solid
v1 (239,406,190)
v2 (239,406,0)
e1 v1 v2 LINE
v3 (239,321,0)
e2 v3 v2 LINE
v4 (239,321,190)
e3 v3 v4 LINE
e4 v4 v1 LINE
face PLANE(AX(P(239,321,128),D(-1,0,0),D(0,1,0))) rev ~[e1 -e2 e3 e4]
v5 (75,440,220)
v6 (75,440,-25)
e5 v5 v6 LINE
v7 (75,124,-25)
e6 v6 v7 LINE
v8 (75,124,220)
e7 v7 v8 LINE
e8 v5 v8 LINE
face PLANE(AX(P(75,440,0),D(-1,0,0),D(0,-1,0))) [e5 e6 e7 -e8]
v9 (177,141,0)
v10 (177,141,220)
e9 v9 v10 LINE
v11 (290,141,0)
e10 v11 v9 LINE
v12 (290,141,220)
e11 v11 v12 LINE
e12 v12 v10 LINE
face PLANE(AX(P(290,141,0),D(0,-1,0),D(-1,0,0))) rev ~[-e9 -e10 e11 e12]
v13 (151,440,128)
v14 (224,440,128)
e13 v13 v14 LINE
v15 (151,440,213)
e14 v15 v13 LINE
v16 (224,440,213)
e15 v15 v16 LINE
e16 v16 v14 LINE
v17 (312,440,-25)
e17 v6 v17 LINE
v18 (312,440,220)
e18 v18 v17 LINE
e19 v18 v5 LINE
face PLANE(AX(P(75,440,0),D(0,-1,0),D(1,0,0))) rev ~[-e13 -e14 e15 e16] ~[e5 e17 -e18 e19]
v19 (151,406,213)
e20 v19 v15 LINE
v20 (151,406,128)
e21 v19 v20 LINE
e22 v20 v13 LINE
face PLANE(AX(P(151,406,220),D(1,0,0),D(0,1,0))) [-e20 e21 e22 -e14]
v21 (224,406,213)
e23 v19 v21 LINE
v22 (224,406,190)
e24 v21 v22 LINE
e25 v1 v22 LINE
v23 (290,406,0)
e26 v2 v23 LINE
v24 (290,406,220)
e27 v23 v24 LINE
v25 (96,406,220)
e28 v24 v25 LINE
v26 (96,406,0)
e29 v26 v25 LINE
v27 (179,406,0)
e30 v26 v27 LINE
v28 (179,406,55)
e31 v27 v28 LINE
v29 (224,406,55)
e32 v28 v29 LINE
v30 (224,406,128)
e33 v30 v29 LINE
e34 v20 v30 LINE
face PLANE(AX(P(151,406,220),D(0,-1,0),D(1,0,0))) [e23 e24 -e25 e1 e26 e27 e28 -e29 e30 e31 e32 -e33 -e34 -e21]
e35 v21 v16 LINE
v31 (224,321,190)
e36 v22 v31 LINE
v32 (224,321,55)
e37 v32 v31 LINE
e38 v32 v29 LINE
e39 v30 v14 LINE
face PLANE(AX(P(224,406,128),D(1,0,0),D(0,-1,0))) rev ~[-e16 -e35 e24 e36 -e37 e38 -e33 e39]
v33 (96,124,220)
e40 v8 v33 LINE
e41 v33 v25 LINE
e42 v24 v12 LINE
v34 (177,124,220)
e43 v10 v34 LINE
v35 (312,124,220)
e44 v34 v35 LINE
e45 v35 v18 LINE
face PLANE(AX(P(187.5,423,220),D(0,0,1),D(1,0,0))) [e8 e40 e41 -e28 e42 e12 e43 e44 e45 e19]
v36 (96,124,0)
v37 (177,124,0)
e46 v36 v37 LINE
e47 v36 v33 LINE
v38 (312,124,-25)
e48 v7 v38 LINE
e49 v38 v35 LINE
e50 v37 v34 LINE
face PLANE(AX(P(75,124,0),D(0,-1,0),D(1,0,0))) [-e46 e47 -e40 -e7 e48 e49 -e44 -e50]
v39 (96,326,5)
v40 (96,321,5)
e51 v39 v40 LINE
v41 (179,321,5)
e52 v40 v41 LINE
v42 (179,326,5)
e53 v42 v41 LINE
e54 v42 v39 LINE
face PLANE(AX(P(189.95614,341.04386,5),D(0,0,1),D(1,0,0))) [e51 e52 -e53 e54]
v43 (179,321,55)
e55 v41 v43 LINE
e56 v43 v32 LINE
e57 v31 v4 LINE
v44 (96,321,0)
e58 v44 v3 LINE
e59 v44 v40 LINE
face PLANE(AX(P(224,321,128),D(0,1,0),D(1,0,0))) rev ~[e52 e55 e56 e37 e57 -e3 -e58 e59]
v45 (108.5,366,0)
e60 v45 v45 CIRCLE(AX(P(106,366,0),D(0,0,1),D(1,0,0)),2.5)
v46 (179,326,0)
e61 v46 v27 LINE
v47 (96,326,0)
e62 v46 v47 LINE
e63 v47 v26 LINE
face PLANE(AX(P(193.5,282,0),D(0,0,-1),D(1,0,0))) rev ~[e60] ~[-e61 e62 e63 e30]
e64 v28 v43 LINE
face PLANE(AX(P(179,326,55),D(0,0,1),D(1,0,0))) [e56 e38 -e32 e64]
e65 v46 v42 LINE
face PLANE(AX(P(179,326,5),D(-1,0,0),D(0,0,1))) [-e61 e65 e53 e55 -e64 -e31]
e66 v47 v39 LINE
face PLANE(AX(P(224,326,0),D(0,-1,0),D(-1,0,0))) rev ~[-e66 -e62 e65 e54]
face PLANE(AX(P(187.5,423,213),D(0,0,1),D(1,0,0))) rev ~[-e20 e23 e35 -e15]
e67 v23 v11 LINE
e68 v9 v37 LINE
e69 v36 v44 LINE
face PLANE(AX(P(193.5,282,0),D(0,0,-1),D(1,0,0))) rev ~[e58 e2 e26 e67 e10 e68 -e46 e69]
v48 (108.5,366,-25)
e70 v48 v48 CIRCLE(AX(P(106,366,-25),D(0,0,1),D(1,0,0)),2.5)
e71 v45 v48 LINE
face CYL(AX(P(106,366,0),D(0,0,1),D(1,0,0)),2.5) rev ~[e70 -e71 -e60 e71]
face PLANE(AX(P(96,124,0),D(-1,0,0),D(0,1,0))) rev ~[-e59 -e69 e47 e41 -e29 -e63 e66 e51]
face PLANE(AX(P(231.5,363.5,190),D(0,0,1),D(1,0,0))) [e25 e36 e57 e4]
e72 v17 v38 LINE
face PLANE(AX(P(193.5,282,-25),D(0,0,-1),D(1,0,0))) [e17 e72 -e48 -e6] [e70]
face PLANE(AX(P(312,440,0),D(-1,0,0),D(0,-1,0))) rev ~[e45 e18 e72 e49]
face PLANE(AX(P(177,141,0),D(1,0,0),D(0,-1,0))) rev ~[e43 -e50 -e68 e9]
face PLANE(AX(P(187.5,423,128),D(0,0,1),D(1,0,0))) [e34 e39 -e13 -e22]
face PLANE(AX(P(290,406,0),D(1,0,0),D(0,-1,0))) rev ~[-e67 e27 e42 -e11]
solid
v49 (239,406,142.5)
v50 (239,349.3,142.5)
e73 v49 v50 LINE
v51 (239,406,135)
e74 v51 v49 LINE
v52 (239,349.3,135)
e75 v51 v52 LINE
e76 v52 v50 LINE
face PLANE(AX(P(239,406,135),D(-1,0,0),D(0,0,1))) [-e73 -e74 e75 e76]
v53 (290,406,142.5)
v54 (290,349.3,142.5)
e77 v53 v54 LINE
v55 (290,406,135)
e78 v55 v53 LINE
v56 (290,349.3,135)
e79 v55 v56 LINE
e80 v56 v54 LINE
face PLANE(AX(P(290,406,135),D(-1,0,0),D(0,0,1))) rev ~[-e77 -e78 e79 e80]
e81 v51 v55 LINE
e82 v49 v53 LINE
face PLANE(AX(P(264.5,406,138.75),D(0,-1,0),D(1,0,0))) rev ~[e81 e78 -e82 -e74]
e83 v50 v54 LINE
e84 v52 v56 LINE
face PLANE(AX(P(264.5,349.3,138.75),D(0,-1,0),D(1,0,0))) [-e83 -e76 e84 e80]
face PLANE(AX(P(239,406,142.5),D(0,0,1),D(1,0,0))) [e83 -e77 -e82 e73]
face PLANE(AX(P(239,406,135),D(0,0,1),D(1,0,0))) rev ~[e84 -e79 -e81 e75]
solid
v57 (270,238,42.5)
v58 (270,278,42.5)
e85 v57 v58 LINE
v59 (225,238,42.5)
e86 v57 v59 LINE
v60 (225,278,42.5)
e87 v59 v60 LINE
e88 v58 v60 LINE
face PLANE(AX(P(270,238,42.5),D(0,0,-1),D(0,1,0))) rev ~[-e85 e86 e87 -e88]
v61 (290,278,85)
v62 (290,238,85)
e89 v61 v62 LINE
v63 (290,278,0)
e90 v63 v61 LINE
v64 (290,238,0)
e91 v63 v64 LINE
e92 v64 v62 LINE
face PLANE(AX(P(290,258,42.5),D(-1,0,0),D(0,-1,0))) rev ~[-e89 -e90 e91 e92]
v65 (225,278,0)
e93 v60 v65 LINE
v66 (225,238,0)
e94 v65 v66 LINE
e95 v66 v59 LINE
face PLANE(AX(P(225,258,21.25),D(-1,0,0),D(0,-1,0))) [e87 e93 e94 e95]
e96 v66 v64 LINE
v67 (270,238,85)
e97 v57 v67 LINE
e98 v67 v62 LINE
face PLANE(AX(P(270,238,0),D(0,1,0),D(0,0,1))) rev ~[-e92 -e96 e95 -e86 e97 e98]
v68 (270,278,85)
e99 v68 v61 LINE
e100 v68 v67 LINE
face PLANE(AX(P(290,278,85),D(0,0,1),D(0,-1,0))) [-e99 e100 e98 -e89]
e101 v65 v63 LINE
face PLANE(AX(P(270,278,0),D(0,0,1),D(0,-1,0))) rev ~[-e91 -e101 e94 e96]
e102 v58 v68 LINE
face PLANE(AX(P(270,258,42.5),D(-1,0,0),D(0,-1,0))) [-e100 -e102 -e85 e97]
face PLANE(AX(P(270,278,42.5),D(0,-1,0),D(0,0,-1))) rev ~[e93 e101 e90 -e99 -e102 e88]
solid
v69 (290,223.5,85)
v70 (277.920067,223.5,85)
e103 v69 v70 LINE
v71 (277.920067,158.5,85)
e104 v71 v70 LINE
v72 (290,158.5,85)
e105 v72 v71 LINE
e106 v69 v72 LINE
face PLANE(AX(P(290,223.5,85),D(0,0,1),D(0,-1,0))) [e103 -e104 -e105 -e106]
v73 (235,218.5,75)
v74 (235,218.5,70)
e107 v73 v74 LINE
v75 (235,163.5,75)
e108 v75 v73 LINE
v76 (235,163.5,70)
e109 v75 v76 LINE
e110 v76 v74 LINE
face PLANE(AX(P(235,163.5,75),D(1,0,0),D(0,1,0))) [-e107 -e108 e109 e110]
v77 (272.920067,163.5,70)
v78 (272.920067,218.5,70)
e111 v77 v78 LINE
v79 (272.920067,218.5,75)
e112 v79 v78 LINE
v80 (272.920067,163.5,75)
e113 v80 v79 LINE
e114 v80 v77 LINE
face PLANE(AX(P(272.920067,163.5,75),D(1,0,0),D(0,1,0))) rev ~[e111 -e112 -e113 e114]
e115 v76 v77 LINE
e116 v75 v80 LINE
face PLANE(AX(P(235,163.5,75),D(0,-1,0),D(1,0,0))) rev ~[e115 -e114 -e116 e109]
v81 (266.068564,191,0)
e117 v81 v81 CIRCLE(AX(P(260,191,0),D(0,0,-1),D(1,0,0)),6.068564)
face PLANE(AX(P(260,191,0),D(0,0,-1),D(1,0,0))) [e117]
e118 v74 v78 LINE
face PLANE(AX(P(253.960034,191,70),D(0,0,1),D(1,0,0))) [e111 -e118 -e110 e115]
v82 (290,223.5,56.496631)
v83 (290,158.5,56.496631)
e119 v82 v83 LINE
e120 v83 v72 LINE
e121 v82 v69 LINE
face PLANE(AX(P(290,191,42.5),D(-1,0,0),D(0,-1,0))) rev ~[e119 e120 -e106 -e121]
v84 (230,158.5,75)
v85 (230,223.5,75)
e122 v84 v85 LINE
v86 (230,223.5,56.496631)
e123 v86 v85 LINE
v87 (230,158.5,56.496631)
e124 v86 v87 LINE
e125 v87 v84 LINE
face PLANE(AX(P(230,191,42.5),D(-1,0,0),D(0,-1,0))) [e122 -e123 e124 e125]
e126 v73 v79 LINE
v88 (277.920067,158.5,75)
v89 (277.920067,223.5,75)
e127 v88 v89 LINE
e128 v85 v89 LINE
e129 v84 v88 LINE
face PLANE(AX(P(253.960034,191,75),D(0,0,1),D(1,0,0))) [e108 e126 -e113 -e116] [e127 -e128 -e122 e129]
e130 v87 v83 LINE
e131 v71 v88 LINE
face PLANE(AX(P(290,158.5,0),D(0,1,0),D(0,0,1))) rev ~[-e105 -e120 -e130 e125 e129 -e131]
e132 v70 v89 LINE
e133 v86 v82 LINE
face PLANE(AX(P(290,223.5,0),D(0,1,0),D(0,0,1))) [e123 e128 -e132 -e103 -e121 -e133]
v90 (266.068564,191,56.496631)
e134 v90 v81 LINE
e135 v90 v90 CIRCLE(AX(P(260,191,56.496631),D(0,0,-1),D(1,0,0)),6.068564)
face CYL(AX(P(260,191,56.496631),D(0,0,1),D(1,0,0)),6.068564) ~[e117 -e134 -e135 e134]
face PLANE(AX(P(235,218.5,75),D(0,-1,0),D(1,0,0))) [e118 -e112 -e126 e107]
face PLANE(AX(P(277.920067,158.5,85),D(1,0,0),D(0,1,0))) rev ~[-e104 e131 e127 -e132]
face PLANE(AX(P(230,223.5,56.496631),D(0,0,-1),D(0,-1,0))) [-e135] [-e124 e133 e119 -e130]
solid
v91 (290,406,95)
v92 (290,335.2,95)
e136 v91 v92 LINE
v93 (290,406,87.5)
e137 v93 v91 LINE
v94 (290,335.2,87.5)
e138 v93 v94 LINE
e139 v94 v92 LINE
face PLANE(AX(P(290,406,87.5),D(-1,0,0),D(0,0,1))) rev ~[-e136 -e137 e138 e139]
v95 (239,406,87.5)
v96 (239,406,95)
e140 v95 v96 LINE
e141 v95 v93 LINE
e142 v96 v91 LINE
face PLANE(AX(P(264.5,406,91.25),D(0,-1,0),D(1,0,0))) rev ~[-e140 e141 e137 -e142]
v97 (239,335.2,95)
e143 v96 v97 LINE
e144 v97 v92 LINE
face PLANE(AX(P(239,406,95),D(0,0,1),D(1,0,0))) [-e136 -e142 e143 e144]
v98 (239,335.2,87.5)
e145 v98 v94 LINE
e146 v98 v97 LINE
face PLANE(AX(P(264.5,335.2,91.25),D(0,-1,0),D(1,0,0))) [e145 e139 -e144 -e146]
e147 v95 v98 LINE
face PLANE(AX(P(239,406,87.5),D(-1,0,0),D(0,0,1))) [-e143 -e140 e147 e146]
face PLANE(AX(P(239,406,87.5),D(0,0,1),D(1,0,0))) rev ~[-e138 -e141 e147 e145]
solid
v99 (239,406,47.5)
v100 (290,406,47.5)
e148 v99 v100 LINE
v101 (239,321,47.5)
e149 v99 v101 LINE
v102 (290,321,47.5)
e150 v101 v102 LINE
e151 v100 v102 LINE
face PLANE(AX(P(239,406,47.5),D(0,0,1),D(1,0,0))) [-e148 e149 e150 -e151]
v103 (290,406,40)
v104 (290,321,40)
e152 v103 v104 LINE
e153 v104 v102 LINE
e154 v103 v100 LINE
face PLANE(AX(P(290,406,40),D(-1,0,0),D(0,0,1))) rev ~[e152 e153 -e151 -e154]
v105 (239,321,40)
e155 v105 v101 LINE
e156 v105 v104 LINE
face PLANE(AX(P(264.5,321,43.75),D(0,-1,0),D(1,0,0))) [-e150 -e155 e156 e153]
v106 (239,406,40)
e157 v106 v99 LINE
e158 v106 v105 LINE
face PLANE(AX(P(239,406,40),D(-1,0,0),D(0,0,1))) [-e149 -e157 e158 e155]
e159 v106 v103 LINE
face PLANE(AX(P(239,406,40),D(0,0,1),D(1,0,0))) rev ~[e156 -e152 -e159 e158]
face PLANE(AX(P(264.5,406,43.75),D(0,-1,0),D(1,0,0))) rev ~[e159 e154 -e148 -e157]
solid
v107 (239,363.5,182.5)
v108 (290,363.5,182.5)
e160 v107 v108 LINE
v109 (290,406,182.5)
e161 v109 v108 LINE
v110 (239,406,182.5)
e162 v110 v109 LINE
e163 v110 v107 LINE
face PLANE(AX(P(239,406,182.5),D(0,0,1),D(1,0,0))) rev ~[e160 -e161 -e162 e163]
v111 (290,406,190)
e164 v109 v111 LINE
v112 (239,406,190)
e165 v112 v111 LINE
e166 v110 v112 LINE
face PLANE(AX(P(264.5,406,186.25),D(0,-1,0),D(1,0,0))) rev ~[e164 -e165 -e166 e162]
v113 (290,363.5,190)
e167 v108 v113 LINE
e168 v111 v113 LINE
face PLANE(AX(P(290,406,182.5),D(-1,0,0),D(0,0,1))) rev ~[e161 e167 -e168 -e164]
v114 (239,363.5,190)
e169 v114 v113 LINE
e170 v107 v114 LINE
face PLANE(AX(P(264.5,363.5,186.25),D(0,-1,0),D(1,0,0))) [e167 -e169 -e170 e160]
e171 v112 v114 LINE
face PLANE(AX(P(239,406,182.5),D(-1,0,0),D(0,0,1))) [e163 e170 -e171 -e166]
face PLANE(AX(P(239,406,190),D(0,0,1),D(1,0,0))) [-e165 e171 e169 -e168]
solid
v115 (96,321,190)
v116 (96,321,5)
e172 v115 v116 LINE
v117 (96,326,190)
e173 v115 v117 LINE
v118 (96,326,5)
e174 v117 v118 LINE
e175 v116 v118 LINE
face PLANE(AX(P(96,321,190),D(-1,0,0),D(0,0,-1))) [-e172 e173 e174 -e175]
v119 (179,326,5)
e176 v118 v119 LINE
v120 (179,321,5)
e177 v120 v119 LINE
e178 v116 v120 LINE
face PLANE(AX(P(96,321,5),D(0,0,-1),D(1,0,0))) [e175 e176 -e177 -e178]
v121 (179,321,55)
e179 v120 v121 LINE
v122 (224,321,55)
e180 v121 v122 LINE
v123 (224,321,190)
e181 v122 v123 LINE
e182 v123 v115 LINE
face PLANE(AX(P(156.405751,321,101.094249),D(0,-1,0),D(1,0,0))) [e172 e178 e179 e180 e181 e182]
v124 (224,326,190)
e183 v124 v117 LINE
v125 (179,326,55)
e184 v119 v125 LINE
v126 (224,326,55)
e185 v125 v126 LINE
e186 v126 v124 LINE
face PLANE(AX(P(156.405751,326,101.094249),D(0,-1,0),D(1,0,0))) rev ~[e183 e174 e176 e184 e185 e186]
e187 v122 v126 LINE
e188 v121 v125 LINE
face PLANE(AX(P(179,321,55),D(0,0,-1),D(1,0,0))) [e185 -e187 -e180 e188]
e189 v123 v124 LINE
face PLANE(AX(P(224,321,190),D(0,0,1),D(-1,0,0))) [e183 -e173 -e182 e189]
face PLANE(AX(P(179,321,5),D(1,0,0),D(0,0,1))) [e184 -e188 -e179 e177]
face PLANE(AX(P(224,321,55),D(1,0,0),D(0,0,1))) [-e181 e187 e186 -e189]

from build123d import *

# Parameters (mm, degrees)
F2_DEPTH  = 220
F3_W      = 73
F3_H      = 34
F4_DEPTH  = 92
F5_W      = 73
F5_H      = 34
F6_DEPTH  = 7
F7_W      = 237
F7_H      = 316
F8_DEPTH  = 25
F9_W      = 40
F9_H      = 85
F10_DEPTH = 10
F11_R     = 2.5
F12_DEPTH = 25
F13_DEPTH = 20
F15_DEPTH = 45
F16_W     = 65
F16_H     = 85
F17_DEPTH = 60
F18_W     = 47.9200673103
F18_H     = 65
F19_DEPTH = 10
F20_W     = 65
F20_H     = 56.4966313541
F21_DEPTH = 60
F22_R     = 6.0685644394
F23_DEPTH = 56.4966313541
F24_W     = 37.9200673103
F24_H     = 55
F25_DEPTH = 5
F27_DEPTH = 5
F29_DEPTH = 123
F30_W     = 45
F30_H     = 80
F31_DEPTH = 55
F32_DEPTH = 5
F34_DEPTH = 5
F35_DEPTH = 62
F37_W     = 51
F37_H     = 7.5
F38_DEPTH = 85
F39_W     = 51
F39_H     = 7.5
F40_DEPTH = 70.8
F41_W     = 51
F41_H     = 7.5
F42_DEPTH = 56.7
F43_W     = 51
F43_H     = 7.5
F44_DEPTH = 42.5


with BuildPart() as f2:
    # F1 (on Top) → F2 (new body)
    with BuildSketch(Plane.XY):
        Polygon((224, 406), (290, 406), (290, 141), (177, 141), (177, 124), (290, 124), (312, 124), (312, 406), (312, 440), (75, 440), (75, 406), (75, 141), (75, 124), (96, 124), (96, 222), (96, 406), (151, 406), align=None)
    extrude(amount=F2_DEPTH)

    # F3 (on face) → F4 (cut)
    with BuildSketch(Plane.XY.offset(220)):
        with Locations((187.5, 423)):
            Rectangle(F3_W, F3_H)
    extrude(amount=-F4_DEPTH, mode=Mode.SUBTRACT)

    # F5 (on face) → F6 (join)
    with BuildSketch(Plane.XY.offset(220)):
        with Locations((187.5, 423)):
            Rectangle(F5_W, F5_H)
    extrude(amount=-F6_DEPTH)

    # F7 (on face) → F8 (join)
    with BuildSketch(Plane(origin=(0, 0, 0), x_dir=(1, 0, 0), z_dir=(0, 0, -1))):
        with Locations((193.5, -282)):
            Rectangle(F7_W, F7_H)
    extrude(amount=F8_DEPTH)

    # F11 (on face) → F12 (cut)
    with BuildSketch(Plane.XY):
        with Locations((106, 366)):
            Circle(F11_R)
    extrude(amount=-F12_DEPTH, mode=Mode.SUBTRACT)

    # F26 (on face) → F27 (join)
    with BuildSketch(Plane.XY):
        Polygon((96, 326), (96, 321), (239, 321), (239, 406), (224, 406), (224, 326), align=None)
    extrude(amount=F27_DEPTH)

    # F28 (on face) → F29 (join, through all)
    with BuildSketch(Plane.XY.offset(5)):
        Polygon((239, 406), (224, 406), (224, 326), (224, 321), (239, 321), align=None)
    extrude(amount=F29_DEPTH)

    # F30 (on face) → F31 (join)
    with BuildSketch(Plane.XY):
        with Locations((201.5, 366)):
            Rectangle(F30_W, F30_H)
    extrude(amount=F31_DEPTH)

    # F32 (add, through all): a face of the model
    f32_faces = [f2.faces().sort_by_distance(p)[0] for p in [
        (201.5, 326, 30),
    ]]
    extrude(f32_faces, amount=F32_DEPTH)

    # F35 (add, through all): a face of the model
    f35_faces = [f2.faces().sort_by_distance(p)[0] for p in [
        (231.5, 363.5, 128),
    ]]
    extrude(f35_faces, amount=F35_DEPTH)


with BuildPart() as f10:
    # F9 (on face) → F10 (new body)
    with BuildSketch(Plane(origin=(290, 0, 0), x_dir=(0, -1, 0), z_dir=(-1, 0, 0))):
        with Locations((-258, 42.5)):
            Rectangle(F9_W, F9_H)
    extrude(amount=F10_DEPTH)

    # F9 (on face) → F13 (join)
    with BuildSketch(Plane(origin=(290, 0, 0), x_dir=(0, -1, 0), z_dir=(-1, 0, 0))):
        with Locations((-258, 42.5)):
            Rectangle(F9_W, F9_H)
    extrude(amount=F13_DEPTH)

    # F14 (on face) → F15 (join)
    with BuildSketch(Plane(origin=(270, 0, 0), x_dir=(0, -1, 0), z_dir=(-1, 0, 0))):
        Polygon((-238, 0), (-238, 42.5), (-258, 42.5), (-278, 42.5), (-278, 0), align=None)
    extrude(amount=F15_DEPTH)


with BuildPart() as f17:
    # F16 (on face) → F17 (new body)
    with BuildSketch(Plane(origin=(290, 0, 0), x_dir=(0, -1, 0), z_dir=(-1, 0, 0))):
        with Locations((-191, 42.5)):
            Rectangle(F16_W, F16_H)
    extrude(amount=F17_DEPTH)

    # F18 (on face) → F19 (cut)
    with BuildSketch(Plane.XY.offset(85)):
        with Locations((253.9600336552, 191)):
            Rectangle(F18_W, F18_H)
    extrude(amount=-F19_DEPTH, mode=Mode.SUBTRACT)

    # F20 (on face) → F21 (cut, through all)
    with BuildSketch(Plane(origin=(230, 0, 0), x_dir=(0, -1, 0), z_dir=(-1, 0, 0))):
        with Locations((-191, 28.248315677)):
            Rectangle(F20_W, F20_H)
    extrude(amount=-F21_DEPTH, mode=Mode.SUBTRACT)

    # F22 (on face) → F23 (join, through all)
    with BuildSketch(Plane(origin=(0, 0, 56.4966313541), x_dir=(1, 0, 0), z_dir=(0, 0, -1))):
        with Locations((260.0000000006, -191)):
            Circle(F22_R)
    extrude(amount=F23_DEPTH)

    # F24 (on face) → F25 (cut)
    with BuildSketch(Plane.XY.offset(75)):
        with Locations((253.9600336552, 191)):
            Rectangle(F24_W, F24_H)
    extrude(amount=-F25_DEPTH, mode=Mode.SUBTRACT)


with BuildPart() as f34:
    # F33 (on face) → F34 (new body, through all)
    with BuildSketch(Plane.XZ.offset(-321)):
        Polygon((179, 5), (179, 55), (224, 55), (224, 190), (96, 190), (96, 5), align=None)
    extrude(amount=-F34_DEPTH)


with BuildPart() as f38:
    # F37 (on face) → F38 (new body)
    with BuildSketch(Plane.XZ.offset(-406)):
        with Locations((264.5, 43.75)):
            Rectangle(F37_W, F37_H)
    extrude(amount=F38_DEPTH)


with BuildPart() as f40:
    # F39 (on face) → F40 (new body)
    with BuildSketch(Plane.XZ.offset(-406)):
        with Locations((264.5, 91.25)):
            Rectangle(F39_W, F39_H)
    extrude(amount=F40_DEPTH)


with BuildPart() as f42:
    # F41 (on face) → F42 (new body)
    with BuildSketch(Plane.XZ.offset(-406)):
        with Locations((264.5, 138.75)):
            Rectangle(F41_W, F41_H)
    extrude(amount=F42_DEPTH)


with BuildPart() as f44:
    # F43 (on face) → F44 (new body)
    with BuildSketch(Plane.XZ.offset(-406)):
        with Locations((264.5, 186.25)):
            Rectangle(F43_W, F43_H)
    extrude(amount=F44_DEPTH)


solid = Compound([f2.part, f10.part, f17.part, f34.part, f38.part, f40.part, f42.part, f44.part])
